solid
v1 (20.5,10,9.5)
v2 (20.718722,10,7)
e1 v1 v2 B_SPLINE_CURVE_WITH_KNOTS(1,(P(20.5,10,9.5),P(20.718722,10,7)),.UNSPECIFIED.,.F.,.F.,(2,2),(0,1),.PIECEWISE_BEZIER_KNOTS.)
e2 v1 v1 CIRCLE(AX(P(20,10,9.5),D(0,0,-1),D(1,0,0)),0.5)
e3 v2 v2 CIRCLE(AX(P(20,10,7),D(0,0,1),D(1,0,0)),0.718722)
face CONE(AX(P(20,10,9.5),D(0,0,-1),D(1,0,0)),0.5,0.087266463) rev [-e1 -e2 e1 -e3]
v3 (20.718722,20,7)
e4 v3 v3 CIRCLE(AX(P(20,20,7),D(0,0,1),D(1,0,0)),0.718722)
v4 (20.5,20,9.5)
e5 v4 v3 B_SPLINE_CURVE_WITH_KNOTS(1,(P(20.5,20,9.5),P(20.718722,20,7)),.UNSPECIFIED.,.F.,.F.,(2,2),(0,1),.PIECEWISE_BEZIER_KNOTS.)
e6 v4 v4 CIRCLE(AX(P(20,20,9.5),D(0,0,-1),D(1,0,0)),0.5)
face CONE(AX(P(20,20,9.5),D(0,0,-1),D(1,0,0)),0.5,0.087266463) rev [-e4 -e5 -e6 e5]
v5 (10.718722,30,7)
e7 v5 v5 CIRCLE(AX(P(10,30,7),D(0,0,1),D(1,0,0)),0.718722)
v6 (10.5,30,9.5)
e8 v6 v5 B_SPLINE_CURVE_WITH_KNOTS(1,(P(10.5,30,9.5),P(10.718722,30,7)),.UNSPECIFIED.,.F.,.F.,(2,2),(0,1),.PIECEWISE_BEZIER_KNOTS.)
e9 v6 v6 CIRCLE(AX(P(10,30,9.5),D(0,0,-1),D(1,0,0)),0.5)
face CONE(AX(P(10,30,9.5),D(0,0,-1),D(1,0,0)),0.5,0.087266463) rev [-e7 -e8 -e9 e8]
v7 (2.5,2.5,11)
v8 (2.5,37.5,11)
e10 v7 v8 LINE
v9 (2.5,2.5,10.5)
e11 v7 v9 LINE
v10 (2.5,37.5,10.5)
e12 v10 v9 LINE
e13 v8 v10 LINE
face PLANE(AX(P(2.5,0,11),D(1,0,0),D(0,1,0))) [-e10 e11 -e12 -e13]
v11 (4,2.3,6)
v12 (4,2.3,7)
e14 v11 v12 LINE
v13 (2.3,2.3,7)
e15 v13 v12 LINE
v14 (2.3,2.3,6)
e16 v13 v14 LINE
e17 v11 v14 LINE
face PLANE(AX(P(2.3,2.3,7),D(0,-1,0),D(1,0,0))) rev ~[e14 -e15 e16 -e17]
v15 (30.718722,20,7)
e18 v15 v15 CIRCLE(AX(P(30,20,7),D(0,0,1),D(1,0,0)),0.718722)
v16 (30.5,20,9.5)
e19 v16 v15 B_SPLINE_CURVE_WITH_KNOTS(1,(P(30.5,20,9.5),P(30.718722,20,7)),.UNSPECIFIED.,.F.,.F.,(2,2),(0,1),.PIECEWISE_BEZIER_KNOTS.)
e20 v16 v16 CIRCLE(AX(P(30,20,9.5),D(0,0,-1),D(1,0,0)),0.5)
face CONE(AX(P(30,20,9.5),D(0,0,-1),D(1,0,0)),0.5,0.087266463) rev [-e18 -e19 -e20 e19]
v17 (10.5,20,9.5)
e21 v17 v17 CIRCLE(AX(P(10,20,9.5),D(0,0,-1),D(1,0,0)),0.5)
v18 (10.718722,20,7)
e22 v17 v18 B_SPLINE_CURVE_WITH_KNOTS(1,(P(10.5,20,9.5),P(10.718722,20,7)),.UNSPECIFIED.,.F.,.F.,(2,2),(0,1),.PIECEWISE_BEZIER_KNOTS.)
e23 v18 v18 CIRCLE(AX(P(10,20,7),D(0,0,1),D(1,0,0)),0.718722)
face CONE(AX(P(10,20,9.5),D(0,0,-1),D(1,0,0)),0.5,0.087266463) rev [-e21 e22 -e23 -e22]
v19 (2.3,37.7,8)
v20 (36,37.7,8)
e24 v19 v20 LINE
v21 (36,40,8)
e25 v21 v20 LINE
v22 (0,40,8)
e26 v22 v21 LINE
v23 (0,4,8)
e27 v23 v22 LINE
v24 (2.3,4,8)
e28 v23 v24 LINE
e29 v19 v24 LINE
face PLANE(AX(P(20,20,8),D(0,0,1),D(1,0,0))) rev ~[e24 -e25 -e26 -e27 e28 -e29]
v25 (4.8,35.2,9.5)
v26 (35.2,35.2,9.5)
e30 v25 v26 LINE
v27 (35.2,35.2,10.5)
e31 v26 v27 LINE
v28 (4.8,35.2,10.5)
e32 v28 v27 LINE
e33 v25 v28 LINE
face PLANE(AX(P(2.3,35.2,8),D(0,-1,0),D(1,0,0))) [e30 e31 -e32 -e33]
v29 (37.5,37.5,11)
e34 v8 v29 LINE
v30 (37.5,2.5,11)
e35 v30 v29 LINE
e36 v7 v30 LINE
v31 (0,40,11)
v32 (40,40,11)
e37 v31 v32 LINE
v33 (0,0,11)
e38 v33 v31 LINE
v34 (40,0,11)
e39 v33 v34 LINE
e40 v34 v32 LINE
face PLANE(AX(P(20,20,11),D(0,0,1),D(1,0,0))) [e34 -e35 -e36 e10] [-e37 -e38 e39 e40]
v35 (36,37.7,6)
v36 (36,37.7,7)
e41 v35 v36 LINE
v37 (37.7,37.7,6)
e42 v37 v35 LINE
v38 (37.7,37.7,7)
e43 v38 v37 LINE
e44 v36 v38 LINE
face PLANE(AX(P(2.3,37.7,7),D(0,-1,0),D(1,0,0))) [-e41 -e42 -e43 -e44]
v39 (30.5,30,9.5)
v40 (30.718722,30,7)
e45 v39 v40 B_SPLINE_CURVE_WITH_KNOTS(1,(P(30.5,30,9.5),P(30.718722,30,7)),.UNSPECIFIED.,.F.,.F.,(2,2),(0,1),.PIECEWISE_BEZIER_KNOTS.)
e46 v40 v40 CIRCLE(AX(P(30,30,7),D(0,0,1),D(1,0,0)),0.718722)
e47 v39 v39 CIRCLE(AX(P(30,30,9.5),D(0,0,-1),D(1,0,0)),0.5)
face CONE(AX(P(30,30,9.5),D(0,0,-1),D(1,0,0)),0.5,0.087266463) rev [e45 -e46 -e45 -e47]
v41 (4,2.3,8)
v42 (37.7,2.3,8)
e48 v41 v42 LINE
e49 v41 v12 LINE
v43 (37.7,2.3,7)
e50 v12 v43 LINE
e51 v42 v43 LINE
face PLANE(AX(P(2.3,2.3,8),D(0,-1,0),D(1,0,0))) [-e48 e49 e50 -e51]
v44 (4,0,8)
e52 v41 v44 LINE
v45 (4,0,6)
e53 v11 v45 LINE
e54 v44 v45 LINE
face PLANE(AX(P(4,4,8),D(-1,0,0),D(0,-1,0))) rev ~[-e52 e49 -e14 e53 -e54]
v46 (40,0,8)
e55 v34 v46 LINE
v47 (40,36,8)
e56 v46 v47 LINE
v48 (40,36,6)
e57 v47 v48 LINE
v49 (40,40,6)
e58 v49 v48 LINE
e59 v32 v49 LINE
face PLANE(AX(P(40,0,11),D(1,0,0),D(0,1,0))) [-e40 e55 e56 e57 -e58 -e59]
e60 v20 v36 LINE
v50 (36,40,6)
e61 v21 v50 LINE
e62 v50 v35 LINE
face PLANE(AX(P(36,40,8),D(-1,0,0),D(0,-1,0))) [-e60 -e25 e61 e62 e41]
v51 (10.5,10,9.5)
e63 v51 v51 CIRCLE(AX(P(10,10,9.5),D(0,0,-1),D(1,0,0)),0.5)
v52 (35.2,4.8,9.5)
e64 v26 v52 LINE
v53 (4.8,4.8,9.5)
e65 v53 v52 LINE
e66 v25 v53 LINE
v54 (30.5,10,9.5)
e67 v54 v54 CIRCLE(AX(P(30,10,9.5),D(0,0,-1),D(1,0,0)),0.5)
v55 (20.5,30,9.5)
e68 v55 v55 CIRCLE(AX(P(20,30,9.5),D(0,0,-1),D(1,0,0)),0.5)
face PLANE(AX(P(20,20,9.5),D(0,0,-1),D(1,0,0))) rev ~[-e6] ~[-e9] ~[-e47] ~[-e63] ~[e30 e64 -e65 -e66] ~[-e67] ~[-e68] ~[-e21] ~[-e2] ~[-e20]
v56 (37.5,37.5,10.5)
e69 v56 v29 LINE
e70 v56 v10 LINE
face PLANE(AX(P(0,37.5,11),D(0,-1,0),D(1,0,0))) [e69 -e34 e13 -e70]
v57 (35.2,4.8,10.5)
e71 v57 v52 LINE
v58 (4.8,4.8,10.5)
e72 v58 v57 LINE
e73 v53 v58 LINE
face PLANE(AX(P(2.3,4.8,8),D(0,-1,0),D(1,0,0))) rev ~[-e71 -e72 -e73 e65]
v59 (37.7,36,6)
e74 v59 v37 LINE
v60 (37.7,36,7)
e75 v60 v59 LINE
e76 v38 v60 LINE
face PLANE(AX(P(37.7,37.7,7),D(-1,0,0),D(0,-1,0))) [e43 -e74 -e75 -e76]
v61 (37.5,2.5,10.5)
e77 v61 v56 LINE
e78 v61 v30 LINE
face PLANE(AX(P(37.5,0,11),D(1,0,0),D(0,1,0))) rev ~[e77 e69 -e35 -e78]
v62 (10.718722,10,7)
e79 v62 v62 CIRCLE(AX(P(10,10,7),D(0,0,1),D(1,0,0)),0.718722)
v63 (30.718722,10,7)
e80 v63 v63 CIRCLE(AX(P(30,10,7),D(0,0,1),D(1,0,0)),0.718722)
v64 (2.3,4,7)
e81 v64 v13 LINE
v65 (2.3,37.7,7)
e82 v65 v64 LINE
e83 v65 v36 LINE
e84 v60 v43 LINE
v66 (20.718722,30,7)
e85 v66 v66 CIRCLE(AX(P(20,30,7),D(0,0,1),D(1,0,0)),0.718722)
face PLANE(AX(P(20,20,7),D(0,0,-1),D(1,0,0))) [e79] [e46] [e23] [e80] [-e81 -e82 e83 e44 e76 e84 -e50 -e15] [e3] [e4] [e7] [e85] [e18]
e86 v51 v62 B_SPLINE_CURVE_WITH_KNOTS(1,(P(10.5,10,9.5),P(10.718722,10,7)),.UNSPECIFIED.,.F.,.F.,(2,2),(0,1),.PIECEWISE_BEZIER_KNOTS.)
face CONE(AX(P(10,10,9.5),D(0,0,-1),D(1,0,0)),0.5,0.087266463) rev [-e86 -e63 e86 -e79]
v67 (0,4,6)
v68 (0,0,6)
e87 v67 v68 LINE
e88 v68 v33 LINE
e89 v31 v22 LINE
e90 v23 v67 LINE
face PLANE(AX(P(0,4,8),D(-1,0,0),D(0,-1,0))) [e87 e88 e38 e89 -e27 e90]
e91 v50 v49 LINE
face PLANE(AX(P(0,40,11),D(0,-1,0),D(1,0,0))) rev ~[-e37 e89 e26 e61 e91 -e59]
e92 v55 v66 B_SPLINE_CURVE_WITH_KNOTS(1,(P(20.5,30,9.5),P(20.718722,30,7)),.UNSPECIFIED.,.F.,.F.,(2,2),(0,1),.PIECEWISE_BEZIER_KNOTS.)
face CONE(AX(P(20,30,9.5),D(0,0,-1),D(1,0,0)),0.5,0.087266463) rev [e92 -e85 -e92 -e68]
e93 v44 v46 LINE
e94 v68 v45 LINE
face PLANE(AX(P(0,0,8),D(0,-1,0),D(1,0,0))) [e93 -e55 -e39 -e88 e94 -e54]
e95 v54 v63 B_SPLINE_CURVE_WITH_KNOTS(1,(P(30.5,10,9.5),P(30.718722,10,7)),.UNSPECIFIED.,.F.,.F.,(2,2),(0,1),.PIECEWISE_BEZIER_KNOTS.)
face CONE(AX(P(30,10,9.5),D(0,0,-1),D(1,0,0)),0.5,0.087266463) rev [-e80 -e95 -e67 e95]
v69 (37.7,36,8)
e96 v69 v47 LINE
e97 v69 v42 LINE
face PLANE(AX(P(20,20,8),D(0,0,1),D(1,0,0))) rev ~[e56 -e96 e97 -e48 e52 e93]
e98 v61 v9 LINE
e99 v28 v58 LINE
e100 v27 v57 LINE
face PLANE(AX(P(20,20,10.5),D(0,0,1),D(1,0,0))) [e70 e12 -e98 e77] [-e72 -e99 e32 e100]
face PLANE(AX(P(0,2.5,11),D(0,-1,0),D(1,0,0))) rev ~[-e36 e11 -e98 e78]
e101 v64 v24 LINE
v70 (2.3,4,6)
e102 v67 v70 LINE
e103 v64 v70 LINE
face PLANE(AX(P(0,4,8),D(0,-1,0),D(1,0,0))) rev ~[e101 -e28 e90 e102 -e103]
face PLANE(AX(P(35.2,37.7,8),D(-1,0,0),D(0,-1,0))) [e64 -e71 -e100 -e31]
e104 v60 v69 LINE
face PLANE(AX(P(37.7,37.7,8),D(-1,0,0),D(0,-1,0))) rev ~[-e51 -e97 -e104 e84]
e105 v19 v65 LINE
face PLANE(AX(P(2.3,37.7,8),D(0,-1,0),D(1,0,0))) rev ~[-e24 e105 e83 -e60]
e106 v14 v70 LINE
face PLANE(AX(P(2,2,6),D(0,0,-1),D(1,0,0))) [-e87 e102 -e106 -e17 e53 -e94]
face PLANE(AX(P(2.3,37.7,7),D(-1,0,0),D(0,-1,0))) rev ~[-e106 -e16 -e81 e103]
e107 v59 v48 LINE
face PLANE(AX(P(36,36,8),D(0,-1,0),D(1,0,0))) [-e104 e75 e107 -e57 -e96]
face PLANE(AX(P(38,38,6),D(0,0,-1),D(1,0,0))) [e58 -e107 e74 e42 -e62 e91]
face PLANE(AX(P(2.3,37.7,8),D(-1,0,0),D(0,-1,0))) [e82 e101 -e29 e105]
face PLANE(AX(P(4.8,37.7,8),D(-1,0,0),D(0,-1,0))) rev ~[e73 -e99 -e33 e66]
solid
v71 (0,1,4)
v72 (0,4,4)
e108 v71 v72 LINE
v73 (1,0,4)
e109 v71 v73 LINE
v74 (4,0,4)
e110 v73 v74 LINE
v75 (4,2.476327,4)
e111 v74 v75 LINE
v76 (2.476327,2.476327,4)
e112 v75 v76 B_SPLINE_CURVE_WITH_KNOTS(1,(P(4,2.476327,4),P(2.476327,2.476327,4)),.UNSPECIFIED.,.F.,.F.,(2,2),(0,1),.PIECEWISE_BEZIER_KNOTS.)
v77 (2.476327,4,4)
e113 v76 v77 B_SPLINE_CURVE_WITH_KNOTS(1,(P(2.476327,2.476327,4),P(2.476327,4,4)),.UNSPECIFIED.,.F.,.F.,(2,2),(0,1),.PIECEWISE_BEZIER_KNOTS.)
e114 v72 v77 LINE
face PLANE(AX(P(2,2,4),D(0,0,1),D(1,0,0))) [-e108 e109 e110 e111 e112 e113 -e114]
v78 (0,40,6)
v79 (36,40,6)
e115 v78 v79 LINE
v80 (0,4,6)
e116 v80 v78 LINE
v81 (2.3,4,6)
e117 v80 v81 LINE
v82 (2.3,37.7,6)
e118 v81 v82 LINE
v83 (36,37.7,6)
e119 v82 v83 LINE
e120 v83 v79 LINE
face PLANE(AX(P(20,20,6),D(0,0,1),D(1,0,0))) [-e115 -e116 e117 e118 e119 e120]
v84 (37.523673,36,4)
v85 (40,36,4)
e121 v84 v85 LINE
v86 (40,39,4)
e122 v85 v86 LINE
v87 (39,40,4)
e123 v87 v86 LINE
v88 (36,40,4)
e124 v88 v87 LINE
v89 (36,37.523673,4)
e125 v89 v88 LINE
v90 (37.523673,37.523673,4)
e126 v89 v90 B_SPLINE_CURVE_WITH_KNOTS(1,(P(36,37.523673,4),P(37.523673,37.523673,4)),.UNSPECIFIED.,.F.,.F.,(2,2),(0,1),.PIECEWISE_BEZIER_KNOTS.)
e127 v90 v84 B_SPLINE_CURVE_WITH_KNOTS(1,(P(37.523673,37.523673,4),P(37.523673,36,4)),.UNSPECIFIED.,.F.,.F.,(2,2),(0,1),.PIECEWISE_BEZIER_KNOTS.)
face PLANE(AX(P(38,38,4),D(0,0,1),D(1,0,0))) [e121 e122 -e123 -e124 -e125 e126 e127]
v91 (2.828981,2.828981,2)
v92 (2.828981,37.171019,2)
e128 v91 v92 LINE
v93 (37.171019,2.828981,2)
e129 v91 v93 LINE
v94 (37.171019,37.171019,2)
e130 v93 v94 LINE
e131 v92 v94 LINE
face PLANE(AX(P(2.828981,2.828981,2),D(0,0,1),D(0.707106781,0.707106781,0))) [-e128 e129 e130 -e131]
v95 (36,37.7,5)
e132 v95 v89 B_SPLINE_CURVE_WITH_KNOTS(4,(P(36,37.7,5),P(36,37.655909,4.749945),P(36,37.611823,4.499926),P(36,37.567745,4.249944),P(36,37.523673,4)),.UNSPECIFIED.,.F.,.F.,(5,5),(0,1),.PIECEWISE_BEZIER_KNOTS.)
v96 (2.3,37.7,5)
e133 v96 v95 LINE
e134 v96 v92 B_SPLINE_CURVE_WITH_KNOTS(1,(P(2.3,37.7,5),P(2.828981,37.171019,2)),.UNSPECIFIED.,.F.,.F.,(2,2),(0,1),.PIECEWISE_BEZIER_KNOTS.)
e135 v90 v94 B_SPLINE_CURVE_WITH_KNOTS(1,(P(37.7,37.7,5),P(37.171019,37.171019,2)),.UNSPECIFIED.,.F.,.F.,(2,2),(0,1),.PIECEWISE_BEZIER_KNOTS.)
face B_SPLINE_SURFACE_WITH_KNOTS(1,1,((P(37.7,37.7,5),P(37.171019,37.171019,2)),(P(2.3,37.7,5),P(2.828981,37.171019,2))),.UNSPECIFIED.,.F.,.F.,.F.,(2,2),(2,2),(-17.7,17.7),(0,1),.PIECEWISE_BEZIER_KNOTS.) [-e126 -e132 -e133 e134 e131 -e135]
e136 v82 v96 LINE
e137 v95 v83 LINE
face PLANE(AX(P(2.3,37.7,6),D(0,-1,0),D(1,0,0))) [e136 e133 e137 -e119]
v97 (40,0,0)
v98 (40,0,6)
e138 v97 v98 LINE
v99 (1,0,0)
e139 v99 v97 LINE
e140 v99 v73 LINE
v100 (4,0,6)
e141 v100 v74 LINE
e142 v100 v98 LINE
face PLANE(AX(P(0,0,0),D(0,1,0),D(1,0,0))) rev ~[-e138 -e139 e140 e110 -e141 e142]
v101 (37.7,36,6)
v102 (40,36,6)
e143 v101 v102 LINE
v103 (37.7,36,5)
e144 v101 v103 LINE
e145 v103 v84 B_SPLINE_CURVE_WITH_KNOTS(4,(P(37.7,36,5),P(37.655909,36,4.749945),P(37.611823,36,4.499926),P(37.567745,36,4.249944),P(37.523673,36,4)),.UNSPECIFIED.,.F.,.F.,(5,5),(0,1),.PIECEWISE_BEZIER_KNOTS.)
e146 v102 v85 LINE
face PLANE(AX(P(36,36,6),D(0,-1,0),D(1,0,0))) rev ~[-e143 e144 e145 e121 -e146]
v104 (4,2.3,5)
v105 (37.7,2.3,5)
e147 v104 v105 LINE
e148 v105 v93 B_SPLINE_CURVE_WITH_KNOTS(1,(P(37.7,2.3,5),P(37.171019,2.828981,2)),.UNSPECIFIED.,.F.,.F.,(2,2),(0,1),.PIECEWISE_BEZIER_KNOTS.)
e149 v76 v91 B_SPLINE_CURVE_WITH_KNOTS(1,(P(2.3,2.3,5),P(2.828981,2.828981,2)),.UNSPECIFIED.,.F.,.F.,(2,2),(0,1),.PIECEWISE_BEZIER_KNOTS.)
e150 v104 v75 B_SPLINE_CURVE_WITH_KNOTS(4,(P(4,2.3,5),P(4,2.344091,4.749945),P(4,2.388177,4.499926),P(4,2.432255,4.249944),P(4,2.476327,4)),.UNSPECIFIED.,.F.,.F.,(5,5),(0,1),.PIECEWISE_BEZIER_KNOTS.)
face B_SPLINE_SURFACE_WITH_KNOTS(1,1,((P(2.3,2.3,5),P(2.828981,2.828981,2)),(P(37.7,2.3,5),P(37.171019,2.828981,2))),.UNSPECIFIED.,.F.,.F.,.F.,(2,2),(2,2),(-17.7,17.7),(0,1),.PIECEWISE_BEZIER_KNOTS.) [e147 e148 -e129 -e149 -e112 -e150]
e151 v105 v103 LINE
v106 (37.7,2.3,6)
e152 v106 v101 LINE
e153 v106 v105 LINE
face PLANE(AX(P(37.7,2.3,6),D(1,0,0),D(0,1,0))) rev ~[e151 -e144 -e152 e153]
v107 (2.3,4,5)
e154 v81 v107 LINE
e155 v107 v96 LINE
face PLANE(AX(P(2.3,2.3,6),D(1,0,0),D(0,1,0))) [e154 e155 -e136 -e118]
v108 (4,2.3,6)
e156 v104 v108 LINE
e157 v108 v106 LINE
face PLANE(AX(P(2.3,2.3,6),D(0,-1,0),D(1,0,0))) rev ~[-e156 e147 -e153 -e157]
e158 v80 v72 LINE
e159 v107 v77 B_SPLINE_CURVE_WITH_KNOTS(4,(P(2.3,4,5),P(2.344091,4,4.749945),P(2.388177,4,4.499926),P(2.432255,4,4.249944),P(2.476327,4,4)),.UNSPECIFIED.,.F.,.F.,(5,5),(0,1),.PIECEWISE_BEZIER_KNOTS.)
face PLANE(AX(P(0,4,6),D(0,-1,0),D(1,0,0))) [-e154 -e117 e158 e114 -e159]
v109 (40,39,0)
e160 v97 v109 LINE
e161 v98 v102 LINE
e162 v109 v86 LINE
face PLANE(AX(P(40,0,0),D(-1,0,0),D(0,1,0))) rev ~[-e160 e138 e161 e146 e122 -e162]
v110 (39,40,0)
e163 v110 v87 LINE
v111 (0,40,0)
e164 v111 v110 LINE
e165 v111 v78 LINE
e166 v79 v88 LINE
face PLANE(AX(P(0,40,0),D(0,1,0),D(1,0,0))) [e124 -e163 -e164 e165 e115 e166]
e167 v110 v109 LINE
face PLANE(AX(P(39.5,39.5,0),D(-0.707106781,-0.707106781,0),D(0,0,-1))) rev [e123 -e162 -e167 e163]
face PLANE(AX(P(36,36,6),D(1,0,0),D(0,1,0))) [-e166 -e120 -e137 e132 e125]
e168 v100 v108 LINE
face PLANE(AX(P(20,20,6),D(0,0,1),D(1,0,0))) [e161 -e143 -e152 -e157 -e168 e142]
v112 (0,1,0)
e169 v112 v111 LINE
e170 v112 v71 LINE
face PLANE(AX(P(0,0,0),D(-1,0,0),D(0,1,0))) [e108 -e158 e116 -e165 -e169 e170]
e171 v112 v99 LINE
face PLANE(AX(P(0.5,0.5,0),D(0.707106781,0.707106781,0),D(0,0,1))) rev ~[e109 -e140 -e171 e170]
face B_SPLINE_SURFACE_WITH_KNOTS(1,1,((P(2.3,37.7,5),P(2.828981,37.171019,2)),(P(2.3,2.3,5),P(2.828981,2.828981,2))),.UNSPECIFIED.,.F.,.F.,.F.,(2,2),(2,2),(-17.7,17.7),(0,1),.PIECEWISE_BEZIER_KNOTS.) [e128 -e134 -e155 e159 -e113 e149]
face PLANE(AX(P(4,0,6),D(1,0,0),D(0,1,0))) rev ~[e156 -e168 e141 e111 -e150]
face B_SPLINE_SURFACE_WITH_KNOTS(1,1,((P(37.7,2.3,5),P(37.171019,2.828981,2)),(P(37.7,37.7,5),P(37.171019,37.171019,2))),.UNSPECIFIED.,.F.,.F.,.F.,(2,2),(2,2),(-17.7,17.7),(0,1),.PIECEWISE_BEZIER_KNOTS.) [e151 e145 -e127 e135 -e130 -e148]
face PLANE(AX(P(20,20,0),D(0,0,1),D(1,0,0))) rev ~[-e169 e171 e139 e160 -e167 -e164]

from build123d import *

# Parameters (mm, degrees)
F0_W      = 40
F0_H      = 40
F1_DEPTH  = 6
F4_W      = 40
F4_H      = 40
F5_DEPTH  = 3
F2_W      = 35.4
F2_H      = 35.4
F6_DEPTH  = 1
F6_FACE_W = 35.4
F6_FACE_H = 35.4
F7_DEPTH  = 3
F7_TAPER  = 10
F9_W      = 35.4
F9_H      = 35.4
F10_DEPTH = 1
F11_T     = -2.5
F12_R     = 0.5
F13_DEPTH = 2.5
F13_TAPER = -5
F14_SIZE  = 1
F17_W     = 4
F17_H     = 4
F18_DEPTH = 2
F19_W     = 35.4
F19_H     = 35.4
F20_DEPTH = 25
F15_W     = 4
F15_H     = 4
F21_DEPTH = 2


with BuildPart() as f1:
    # F0 (on Top) → F1 (new body)
    with BuildSketch(Plane.XY):
        with Locations((20, 20)):
            Rectangle(F0_W, F0_H)
    extrude(amount=F1_DEPTH)

    # F2 (on face) → F6 (cut)
    with BuildSketch(Plane.XY.offset(6)):
        with Locations((20, 20)):
            Rectangle(F2_W, F2_H)
    extrude(amount=-F6_DEPTH, mode=Mode.SUBTRACT)

    # F6_face (on face) → F7 (cut)
    with BuildSketch(Plane(origin=(20, 20, 5), x_dir=(1, 0, 0), z_dir=(0, 0, 1))):
        Rectangle(F6_FACE_W, F6_FACE_H)
    extrude(amount=-F7_DEPTH, taper=F7_TAPER, mode=Mode.SUBTRACT)

    # F14
    f14_edges = [f1.edges().sort_by_distance(p)[0] for p in [
        (0, 0, 3),
        (40, 40, 3),
    ]]
    chamfer(f14_edges, length=F14_SIZE)

    # F15 (on face) → F21 (cut)
    with BuildSketch(Plane.XY.offset(6)):
        with Locations((2, 2)):
            Rectangle(F15_W, F15_H)
        with Locations((38, 38)):
            Rectangle(F15_W, F15_H)
    extrude(amount=-F21_DEPTH, mode=Mode.SUBTRACT)


with BuildPart() as f5:
    # F4 (on offset) → F5 (new body)
    with BuildSketch(Plane.XY.offset(11)):
        with Locations((20, 20)):
            Rectangle(F4_W, F4_H)
    extrude(amount=-F5_DEPTH)

    # F9 (on face) → F10 (join)
    with BuildSketch(Plane(origin=(0, 0, 8), x_dir=(1, 0, 0), z_dir=(0, 0, -1))):
        with Locations((20, -20)):
            Rectangle(F9_W, F9_H)
    extrude(amount=F10_DEPTH)

    # F11
    f11_openings = [f5.faces().sort_by_distance(p)[0] for p in [
        (20, 20, 11),
    ]]
    offset(amount=F11_T, openings=f11_openings, kind=Kind.INTERSECTION)

    # F12 (on face) → F13 (cut, through all)
    with BuildSketch(Plane.XY.offset(9.5)):
        with Locations((10, 30)):
            Circle(F12_R)
        with Locations((20, 30)):
            Circle(F12_R)
        with Locations((30, 30)):
            Circle(F12_R)
        with Locations((10, 20)):
            Circle(F12_R)
        with Locations((10, 10)):
            Circle(F12_R)
        with Locations((20, 20)):
            Circle(F12_R)
        with Locations((20, 10)):
            Circle(F12_R)
        with Locations((30, 20)):
            Circle(F12_R)
        with Locations((30, 10)):
            Circle(F12_R)
    extrude(amount=-F13_DEPTH, taper=F13_TAPER, mode=Mode.SUBTRACT)

    # F17 (on face) → F18 (join)
    with BuildSketch(Plane(origin=(0, 0, 8), x_dir=(1, 0, 0), z_dir=(0, 0, -1))):
        with Locations((2, -2)):
            Rectangle(F17_W, F17_H)
        with Locations((38, -38)):
            Rectangle(F17_W, F17_H)
    extrude(amount=F18_DEPTH)

    # F19 (on face) → F20 (cut)
    with BuildSketch(Plane(origin=(0, 0, 7), x_dir=(1, 0, 0), z_dir=(0, 0, -1))):
        with Locations((20, -20)):
            Rectangle(F19_W, F19_H)
    extrude(amount=F20_DEPTH, mode=Mode.SUBTRACT)


solid = Compound([f1.part, f5.part])
